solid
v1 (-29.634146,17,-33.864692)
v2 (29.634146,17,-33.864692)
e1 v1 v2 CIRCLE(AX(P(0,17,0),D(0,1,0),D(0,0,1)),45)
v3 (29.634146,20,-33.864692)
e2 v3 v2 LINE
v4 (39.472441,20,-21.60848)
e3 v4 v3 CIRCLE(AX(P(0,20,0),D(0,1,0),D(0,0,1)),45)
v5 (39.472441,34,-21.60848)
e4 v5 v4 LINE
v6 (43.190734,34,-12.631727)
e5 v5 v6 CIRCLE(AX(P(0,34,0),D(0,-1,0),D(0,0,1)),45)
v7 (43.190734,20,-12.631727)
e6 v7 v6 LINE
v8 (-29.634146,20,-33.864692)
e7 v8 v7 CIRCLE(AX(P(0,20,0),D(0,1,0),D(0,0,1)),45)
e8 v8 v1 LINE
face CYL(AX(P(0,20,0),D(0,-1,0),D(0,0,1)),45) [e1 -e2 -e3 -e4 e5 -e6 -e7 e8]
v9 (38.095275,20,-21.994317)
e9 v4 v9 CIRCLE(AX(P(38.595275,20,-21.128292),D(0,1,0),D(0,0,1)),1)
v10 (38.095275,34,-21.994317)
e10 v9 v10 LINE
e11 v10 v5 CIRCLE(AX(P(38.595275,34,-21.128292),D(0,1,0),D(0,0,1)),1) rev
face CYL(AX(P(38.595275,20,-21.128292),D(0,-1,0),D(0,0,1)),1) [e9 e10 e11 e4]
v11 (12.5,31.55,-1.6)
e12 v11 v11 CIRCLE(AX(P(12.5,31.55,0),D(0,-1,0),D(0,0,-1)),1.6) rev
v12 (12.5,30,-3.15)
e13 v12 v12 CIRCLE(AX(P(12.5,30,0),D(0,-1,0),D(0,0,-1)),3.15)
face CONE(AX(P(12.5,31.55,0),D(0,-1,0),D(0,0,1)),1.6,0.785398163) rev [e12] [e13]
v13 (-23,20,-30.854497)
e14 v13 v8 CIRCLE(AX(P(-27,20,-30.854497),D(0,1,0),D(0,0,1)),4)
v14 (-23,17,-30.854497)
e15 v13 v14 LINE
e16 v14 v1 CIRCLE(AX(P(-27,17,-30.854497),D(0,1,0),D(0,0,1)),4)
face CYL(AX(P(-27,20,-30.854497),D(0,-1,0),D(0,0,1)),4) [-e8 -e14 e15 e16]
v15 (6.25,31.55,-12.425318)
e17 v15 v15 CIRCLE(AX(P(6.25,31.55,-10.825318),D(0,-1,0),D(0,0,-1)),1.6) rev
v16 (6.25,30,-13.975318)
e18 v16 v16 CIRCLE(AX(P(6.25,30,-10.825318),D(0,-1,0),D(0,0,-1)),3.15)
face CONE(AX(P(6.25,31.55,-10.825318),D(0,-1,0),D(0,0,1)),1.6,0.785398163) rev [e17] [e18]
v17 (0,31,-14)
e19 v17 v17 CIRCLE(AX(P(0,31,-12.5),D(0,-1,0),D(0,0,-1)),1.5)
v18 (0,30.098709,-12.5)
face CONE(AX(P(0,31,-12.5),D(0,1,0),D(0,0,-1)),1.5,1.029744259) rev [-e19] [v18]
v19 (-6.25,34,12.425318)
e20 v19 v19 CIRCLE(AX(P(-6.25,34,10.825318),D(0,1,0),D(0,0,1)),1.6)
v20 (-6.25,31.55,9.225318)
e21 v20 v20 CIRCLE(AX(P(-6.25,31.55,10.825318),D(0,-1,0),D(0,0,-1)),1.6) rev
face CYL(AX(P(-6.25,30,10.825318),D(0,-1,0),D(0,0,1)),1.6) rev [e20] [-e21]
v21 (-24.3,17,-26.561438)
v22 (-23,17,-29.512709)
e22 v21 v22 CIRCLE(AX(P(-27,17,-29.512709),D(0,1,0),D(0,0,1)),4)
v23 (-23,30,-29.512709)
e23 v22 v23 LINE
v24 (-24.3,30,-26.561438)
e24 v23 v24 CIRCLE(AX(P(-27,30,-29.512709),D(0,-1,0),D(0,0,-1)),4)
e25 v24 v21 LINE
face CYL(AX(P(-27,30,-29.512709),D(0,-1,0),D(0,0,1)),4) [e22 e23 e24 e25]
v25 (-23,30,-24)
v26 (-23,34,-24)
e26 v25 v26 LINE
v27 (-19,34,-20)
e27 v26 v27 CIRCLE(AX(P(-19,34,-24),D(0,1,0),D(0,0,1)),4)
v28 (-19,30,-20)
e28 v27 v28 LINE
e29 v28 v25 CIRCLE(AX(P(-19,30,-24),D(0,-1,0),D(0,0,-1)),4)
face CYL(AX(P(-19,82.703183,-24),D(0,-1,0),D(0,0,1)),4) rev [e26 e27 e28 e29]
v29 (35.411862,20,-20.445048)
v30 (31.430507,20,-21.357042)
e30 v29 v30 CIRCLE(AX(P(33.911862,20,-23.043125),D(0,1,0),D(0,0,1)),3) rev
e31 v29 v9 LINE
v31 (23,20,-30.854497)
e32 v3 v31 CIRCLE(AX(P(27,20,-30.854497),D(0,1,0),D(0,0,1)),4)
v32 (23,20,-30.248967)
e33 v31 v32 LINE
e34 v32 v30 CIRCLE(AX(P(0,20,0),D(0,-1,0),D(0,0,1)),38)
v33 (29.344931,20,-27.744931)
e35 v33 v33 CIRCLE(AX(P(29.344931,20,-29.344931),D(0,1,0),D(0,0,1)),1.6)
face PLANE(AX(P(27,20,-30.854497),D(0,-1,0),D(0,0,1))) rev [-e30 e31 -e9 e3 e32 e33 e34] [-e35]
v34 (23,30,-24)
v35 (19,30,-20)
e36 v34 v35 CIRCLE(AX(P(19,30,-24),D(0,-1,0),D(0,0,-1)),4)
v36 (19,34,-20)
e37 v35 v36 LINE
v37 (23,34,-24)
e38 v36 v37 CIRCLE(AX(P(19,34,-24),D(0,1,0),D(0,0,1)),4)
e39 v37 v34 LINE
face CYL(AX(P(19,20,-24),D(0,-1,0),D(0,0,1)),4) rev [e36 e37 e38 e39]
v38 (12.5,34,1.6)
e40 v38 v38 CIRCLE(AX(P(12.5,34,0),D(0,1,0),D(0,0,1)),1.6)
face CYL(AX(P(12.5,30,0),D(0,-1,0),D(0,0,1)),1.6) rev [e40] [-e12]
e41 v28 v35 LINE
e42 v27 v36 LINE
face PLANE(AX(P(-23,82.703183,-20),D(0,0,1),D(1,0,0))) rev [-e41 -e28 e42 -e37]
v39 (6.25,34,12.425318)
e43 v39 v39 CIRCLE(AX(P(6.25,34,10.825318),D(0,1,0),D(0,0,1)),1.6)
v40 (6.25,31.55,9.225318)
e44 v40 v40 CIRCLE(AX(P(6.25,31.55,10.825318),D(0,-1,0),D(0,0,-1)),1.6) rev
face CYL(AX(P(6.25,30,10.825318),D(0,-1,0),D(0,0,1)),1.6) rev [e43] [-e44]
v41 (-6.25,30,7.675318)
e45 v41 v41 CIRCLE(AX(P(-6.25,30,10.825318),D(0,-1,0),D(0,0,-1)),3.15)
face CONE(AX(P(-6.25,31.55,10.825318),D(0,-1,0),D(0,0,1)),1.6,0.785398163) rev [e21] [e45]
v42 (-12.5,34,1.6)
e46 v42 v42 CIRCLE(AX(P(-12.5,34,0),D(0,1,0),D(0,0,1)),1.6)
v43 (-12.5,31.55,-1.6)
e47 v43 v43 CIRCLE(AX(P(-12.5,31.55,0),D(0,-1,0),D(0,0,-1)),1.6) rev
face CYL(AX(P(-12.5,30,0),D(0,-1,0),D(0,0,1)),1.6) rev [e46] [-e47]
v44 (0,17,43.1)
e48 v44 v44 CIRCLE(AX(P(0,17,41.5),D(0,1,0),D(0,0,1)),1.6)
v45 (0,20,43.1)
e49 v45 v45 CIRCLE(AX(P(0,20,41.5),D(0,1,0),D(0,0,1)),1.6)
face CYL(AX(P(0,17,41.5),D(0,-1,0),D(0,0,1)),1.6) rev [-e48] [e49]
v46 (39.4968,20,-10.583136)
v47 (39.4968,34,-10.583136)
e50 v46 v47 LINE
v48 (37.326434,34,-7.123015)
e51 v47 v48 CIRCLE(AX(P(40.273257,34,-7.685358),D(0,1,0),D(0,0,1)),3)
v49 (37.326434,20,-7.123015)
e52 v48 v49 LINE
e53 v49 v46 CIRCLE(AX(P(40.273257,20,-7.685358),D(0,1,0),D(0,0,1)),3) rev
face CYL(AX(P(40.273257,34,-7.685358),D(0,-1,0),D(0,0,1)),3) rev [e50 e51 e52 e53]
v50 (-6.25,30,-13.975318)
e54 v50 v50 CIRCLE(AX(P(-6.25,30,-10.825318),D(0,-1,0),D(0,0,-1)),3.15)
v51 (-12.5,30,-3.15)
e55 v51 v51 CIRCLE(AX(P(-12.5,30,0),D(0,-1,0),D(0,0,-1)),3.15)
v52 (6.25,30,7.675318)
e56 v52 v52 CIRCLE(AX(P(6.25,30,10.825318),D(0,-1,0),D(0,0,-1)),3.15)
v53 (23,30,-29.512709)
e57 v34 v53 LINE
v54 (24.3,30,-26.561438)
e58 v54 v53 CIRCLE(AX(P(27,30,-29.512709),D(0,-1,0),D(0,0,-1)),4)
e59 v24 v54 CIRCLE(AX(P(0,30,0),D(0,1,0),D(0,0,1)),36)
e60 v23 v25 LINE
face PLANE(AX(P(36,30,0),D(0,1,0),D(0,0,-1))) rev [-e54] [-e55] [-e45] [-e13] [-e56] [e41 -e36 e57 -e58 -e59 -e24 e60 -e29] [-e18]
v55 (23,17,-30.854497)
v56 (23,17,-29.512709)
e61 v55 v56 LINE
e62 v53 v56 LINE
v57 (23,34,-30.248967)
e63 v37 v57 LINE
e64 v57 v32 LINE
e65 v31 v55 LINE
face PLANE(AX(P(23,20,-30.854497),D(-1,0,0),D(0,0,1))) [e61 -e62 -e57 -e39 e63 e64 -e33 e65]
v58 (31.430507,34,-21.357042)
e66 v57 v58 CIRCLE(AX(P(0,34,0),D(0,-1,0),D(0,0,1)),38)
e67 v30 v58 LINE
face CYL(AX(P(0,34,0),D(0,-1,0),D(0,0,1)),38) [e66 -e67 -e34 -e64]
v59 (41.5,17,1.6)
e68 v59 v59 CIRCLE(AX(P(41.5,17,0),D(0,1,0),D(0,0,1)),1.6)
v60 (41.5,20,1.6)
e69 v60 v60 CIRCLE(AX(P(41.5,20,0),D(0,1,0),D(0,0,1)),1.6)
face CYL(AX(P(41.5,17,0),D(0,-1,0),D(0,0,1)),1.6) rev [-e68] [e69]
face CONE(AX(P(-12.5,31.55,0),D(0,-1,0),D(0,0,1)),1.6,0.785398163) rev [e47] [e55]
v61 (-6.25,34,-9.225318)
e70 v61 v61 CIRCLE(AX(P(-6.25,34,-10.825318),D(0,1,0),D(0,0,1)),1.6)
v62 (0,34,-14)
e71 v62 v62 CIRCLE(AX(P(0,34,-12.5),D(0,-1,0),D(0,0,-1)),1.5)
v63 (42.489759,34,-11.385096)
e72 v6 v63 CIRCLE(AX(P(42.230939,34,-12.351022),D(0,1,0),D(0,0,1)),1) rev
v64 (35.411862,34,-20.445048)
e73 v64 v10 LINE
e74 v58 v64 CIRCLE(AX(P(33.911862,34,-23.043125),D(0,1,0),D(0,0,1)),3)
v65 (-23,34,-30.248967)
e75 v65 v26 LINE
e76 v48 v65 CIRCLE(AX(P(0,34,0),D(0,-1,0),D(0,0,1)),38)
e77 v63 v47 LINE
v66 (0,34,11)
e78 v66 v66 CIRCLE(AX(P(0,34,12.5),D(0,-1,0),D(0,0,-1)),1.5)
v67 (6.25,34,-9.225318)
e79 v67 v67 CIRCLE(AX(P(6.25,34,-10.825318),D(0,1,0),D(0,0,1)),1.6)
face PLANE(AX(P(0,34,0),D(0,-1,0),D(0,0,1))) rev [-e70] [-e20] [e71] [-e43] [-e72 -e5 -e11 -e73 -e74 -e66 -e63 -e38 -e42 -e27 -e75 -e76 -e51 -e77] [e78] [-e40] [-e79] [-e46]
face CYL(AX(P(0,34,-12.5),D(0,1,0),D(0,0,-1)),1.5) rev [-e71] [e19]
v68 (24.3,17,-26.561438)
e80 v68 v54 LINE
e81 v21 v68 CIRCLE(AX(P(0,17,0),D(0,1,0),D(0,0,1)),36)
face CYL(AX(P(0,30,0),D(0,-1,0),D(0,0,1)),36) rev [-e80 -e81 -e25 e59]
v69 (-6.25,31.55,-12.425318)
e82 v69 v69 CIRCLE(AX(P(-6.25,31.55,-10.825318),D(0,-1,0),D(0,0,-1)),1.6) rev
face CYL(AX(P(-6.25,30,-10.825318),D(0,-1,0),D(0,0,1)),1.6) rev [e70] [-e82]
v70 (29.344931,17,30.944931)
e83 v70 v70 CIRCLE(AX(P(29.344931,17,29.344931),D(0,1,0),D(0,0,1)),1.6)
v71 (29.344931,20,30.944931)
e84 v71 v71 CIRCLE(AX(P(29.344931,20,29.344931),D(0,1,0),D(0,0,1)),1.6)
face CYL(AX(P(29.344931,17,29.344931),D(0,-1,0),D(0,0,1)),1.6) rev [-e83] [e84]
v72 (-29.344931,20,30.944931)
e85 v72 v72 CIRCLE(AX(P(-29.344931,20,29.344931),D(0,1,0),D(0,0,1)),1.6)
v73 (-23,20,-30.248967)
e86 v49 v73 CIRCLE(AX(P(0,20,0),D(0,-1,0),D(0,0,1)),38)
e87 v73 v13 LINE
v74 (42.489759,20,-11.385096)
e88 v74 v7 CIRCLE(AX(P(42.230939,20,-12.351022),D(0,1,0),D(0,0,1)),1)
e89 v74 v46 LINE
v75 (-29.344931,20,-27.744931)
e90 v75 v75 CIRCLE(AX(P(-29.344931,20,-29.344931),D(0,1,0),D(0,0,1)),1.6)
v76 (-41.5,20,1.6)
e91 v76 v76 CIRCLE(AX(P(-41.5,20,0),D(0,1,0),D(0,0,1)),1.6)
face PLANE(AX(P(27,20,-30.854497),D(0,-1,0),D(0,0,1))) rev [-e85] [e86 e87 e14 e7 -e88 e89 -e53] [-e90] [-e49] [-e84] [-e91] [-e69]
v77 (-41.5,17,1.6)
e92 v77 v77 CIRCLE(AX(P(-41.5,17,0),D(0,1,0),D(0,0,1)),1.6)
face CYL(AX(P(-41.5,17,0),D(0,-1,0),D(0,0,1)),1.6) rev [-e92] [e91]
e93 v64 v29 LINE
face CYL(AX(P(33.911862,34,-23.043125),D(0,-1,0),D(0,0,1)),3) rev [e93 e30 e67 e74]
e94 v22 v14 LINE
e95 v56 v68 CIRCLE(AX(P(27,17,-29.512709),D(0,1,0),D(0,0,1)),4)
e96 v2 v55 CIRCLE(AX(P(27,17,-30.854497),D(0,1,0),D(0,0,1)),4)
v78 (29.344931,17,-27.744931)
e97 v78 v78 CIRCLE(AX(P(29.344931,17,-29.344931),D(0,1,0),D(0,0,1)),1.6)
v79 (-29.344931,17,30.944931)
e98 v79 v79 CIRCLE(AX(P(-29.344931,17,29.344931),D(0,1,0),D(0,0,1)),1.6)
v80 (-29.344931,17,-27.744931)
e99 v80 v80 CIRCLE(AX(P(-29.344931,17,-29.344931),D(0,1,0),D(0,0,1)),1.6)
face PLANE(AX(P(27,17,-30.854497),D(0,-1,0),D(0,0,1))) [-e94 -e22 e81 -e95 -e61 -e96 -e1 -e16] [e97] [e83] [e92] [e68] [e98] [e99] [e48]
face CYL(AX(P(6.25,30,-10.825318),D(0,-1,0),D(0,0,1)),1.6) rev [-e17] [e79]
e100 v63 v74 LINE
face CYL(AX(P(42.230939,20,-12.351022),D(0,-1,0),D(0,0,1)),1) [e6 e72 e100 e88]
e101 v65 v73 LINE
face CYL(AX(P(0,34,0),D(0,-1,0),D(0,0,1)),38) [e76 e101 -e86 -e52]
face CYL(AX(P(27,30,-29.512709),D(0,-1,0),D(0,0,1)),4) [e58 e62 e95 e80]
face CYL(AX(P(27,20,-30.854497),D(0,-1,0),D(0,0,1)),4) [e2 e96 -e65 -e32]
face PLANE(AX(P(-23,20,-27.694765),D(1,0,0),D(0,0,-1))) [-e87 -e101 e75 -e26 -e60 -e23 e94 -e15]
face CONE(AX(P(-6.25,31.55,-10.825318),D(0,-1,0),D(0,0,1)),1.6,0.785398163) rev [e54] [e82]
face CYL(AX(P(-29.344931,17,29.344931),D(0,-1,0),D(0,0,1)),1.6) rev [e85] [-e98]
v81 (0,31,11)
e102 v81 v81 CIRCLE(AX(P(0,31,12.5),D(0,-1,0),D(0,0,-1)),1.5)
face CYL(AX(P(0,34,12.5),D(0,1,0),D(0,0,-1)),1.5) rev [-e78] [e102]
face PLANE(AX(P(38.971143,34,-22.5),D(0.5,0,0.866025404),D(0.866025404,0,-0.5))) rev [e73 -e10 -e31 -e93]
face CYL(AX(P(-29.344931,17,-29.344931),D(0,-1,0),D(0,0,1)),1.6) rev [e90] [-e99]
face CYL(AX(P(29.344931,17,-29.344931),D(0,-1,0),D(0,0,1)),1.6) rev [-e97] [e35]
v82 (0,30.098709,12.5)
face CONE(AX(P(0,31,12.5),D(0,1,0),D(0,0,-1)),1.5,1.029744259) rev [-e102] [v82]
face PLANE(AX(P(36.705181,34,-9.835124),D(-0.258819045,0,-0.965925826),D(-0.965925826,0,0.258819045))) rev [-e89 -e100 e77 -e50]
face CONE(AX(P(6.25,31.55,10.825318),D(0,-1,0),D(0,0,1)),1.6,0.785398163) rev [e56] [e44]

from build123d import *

# Parameters (mm, degrees)
EXTRUDE_1_DEPTH             = 3
EXTRUDE_2_DEPTH             = 14
CUT_EXTRUDE_1_REACH         = 66.954
SKETCH_5_W                  = 36
SKETCH_5_H                  = 13
HOLE_WIZARD_3_0_3_1_D       = 3
HOLE_WIZARD_3_0_3_1_DEPTH   = 3
HOLE_WIZARD_3_0_3_1_TIP     = 0.901290929
HOLE_WIZARD_3_2_3_2_1_D     = 3.2
HOLE_WIZARD_3_2_3_2_1_DEPTH = 17
HOLE_WIZARD_3_2_3_2_2_D     = 3.2
CHAMFER_1_SIZE              = 1.55
FILLET_1_R                  = 1
FILLET_2_R                  = 3
FILLET_3_R                  = 4


with BuildPart() as part:
    # Эскиз1 → Бобышка-Вытянуть1 (new body)
    with BuildSketch(Plane(origin=(0, 17, 0), x_dir=(1, 0, 0), z_dir=(0, 1, 0))):
        with BuildLine():
            Line((23, 30.854497241), (23, 27.694764848))
            ThreePointArc((23, 27.694764848), (0, 36), (-23, 27.694764848))
            Line((-23, 27.694764848), (-23, 30.854497241))
            ThreePointArc((-23, 30.854497241), (-25.347212259, 34.497064012), (-29.634146341, 33.864692094))
            ThreePointArc((-29.634146341, 33.864692094), (0, -45), (29.634146341, 33.864692094))
            ThreePointArc((29.634146341, 33.864692094), (25.347212259, 34.497064012), (23, 30.854497241))
        make_face()
    extrude(amount=-EXTRUDE_1_DEPTH)

    # Эскиз2 → Бобышка-Вытянуть2 (add)
    with BuildSketch(Plane.XZ.offset(-14)):
        with BuildLine():
            Line((-23, -27.694764848), (-23, -30.248966925))
            ThreePointArc((-23, -30.248966925), (-12.293870341, 35.956372899), (36.705181399, -9.835123714))
            Line((36.705181399, -9.835123714), (43.466662183, -11.64685703))
            ThreePointArc((43.466662183, -11.64685703), (41.574578963, -17.220754456), (38.97114317, -22.5))
            Line((38.97114317, -22.5), (32.908965344, -19))
            ThreePointArc((32.908965344, -19), (28.514696486, -25.117963379), (23, -30.248966925))
            Line((23, -30.248966925), (23, -27.694764848))
            ThreePointArc((23, -27.694764848), (0, -36), (-23, -27.694764848))
        make_face()
    extrude(amount=EXTRUDE_2_DEPTH)

    # Эскиз4 → Вырез-Вытянуть1 (cut, up to next)
    with BuildSketch(Plane(origin=(0, 4, 0), x_dir=(1, 0, 0), z_dir=(0, 1, 0)), mode=Mode.PRIVATE) as cut_extrude_1_sk1:
        with BuildLine():
            Line((-23, 27.694764848), (-23, 20))
            Line((-23, 20), (23, 20))
            Line((23, 20), (23, 27.694764848))
            ThreePointArc((23, 27.694764848), (0, 36), (-23, 27.694764848))
        make_face()
    cut_extrude_1_tool1 = extrude(cut_extrude_1_sk1.sketch, amount=-CUT_EXTRUDE_1_REACH, mode=Mode.PRIVATE) & part.part
    add(cut_extrude_1_tool1.solids().sort_by_distance((0, 4, -26.906646))[0], mode=Mode.SUBTRACT)

    # Эскиз5 → Вырез-Повернуть1 (revolve, cut)
    with BuildSketch(Plane(origin=(0, 0, 0), x_dir=(-1, 0, 0), z_dir=(0, 0, -1))):
        with Locations((-18, 10.5)):
            Rectangle(SKETCH_5_W, SKETCH_5_H)
    revolve(axis=Axis((0, 4, 0), (0, 1, 0)), mode=Mode.SUBTRACT)

    # Диаметр отверстия Ø3.0 (3)1
    with Locations(Plane(origin=(0, 0, 0), x_dir=(-1, 0, 0), z_dir=(0, -1, 0))):
        with Locations((0, -12.5), (0, 12.5)):
            Hole(HOLE_WIZARD_3_0_3_1_D / 2, depth=HOLE_WIZARD_3_0_3_1_DEPTH)
            with Locations((0, 0, -(HOLE_WIZARD_3_0_3_1_DEPTH + HOLE_WIZARD_3_0_3_1_TIP / 2))):  # 118° drill point
                Cone(0, HOLE_WIZARD_3_0_3_1_D / 2, HOLE_WIZARD_3_0_3_1_TIP, mode=Mode.SUBTRACT)

    # Диаметр отверстия Ø3.2 (3.2)1
    with Locations(Plane(origin=(0, 17, 0), x_dir=(1, 0, 0), z_dir=(0, 1, 0))):
        with Locations((29.344931419, -29.344931419), (0, -41.5), (-29.344931419, -29.344931419), (-41.5, 0), (-29.344931419, 29.344931419), (29.344931419, 29.344931419), (41.5, 0)):
            Hole(HOLE_WIZARD_3_2_3_2_1_D / 2, depth=HOLE_WIZARD_3_2_3_2_1_DEPTH)

    # Диаметр отверстия Ø3.2 (3.2)2 (through all)
    with Locations(Plane(origin=(0, 4, 0), x_dir=(1, 0, 0), z_dir=(0, 1, 0))):
        with Locations((-6.25, -10.825317547), (6.25, -10.825317547), (12.5, 0), (6.25, 10.825317547), (-6.25, 10.825317547), (-12.5, 0)):
            Hole(HOLE_WIZARD_3_2_3_2_2_D / 2)

    # Фаска1
    chamfer_1_edges = [part.edges().sort_by_distance(p)[0] for p in [
        (-10.9, 4, 0),
        (-4.65, 4, -10.825317547),
        (7.85, 4, -10.825317547),
        (14.1, 4, 0),
        (7.85, 4, 10.825317547),
        (-4.65, 4, 10.825317547),
    ]]
    chamfer(chamfer_1_edges, length=CHAMFER_1_SIZE)

    # Скругление1
    # the kernel refuses this fillet: 1 mm, written as the material it takes off along each edge
    with BuildSketch(Plane(origin=(38.97114317, 14, -22.5), x_dir=(-0.8660254037844388, 0, 0.4999999999999999), z_dir=(0, -1, 0))) as fillet_1_piece_1:
        with BuildLine():
            CenterArc((1.011365104, -1), FILLET_1_R, 90, 91.302288935)
            ThreePointArc((0.011623402, -1.022727273), (0.002905944, -0.511396661), (0, 0))
            Line((0, 0), (1.011365104, 0))
        make_face()
    extrude(amount=16.556983303, mode=Mode.SUBTRACT)
    with BuildSketch(Plane(origin=(43.466662183, 14, -11.64685703), x_dir=(-0.9659258262890692, 0, 0.2588190451025174), z_dir=(0, -1, 0))) as fillet_1_piece_2:
        with BuildLine():
            CenterArc((1.011365104, 1), FILLET_1_R, 178.697711065, 91.302288935)
            ThreePointArc((0.011623402, 1.022727273), (0.002905944, 0.511396661), (0, 0))
            Line((0, 0), (1.011365104, 0))
        make_face()
    extrude(amount=16.556983303, mode=Mode.SUBTRACT)

    # Скругление2
    fillet_2_edges = [part.edges().sort_by_distance(p)[0] for p in [
        (32.908965344, 7, -19),
        (36.705181399, 7, -9.835123714),
    ]]
    fillet(fillet_2_edges, radius=FILLET_2_R)

    # Скругление3
    fillet_3_edges = [part.edges().sort_by_distance(p)[0] for p in [
        (23, 10.5, -27.694764848),
        (-23, 10.5, -27.694764848),
        (-23, 2, -20),
        (23, 2, -20),
    ]]
    fillet(fillet_3_edges, radius=FILLET_3_R)


with BuildPart() as body_2:
    # Зеркальное отражение1: mirrored copy
    add(part.part.mirror(Plane(origin=(27, 17, -30.854497241), x_dir=(0, 0, 1), z_dir=(0, 1, 0))))


solid = body_2.part
